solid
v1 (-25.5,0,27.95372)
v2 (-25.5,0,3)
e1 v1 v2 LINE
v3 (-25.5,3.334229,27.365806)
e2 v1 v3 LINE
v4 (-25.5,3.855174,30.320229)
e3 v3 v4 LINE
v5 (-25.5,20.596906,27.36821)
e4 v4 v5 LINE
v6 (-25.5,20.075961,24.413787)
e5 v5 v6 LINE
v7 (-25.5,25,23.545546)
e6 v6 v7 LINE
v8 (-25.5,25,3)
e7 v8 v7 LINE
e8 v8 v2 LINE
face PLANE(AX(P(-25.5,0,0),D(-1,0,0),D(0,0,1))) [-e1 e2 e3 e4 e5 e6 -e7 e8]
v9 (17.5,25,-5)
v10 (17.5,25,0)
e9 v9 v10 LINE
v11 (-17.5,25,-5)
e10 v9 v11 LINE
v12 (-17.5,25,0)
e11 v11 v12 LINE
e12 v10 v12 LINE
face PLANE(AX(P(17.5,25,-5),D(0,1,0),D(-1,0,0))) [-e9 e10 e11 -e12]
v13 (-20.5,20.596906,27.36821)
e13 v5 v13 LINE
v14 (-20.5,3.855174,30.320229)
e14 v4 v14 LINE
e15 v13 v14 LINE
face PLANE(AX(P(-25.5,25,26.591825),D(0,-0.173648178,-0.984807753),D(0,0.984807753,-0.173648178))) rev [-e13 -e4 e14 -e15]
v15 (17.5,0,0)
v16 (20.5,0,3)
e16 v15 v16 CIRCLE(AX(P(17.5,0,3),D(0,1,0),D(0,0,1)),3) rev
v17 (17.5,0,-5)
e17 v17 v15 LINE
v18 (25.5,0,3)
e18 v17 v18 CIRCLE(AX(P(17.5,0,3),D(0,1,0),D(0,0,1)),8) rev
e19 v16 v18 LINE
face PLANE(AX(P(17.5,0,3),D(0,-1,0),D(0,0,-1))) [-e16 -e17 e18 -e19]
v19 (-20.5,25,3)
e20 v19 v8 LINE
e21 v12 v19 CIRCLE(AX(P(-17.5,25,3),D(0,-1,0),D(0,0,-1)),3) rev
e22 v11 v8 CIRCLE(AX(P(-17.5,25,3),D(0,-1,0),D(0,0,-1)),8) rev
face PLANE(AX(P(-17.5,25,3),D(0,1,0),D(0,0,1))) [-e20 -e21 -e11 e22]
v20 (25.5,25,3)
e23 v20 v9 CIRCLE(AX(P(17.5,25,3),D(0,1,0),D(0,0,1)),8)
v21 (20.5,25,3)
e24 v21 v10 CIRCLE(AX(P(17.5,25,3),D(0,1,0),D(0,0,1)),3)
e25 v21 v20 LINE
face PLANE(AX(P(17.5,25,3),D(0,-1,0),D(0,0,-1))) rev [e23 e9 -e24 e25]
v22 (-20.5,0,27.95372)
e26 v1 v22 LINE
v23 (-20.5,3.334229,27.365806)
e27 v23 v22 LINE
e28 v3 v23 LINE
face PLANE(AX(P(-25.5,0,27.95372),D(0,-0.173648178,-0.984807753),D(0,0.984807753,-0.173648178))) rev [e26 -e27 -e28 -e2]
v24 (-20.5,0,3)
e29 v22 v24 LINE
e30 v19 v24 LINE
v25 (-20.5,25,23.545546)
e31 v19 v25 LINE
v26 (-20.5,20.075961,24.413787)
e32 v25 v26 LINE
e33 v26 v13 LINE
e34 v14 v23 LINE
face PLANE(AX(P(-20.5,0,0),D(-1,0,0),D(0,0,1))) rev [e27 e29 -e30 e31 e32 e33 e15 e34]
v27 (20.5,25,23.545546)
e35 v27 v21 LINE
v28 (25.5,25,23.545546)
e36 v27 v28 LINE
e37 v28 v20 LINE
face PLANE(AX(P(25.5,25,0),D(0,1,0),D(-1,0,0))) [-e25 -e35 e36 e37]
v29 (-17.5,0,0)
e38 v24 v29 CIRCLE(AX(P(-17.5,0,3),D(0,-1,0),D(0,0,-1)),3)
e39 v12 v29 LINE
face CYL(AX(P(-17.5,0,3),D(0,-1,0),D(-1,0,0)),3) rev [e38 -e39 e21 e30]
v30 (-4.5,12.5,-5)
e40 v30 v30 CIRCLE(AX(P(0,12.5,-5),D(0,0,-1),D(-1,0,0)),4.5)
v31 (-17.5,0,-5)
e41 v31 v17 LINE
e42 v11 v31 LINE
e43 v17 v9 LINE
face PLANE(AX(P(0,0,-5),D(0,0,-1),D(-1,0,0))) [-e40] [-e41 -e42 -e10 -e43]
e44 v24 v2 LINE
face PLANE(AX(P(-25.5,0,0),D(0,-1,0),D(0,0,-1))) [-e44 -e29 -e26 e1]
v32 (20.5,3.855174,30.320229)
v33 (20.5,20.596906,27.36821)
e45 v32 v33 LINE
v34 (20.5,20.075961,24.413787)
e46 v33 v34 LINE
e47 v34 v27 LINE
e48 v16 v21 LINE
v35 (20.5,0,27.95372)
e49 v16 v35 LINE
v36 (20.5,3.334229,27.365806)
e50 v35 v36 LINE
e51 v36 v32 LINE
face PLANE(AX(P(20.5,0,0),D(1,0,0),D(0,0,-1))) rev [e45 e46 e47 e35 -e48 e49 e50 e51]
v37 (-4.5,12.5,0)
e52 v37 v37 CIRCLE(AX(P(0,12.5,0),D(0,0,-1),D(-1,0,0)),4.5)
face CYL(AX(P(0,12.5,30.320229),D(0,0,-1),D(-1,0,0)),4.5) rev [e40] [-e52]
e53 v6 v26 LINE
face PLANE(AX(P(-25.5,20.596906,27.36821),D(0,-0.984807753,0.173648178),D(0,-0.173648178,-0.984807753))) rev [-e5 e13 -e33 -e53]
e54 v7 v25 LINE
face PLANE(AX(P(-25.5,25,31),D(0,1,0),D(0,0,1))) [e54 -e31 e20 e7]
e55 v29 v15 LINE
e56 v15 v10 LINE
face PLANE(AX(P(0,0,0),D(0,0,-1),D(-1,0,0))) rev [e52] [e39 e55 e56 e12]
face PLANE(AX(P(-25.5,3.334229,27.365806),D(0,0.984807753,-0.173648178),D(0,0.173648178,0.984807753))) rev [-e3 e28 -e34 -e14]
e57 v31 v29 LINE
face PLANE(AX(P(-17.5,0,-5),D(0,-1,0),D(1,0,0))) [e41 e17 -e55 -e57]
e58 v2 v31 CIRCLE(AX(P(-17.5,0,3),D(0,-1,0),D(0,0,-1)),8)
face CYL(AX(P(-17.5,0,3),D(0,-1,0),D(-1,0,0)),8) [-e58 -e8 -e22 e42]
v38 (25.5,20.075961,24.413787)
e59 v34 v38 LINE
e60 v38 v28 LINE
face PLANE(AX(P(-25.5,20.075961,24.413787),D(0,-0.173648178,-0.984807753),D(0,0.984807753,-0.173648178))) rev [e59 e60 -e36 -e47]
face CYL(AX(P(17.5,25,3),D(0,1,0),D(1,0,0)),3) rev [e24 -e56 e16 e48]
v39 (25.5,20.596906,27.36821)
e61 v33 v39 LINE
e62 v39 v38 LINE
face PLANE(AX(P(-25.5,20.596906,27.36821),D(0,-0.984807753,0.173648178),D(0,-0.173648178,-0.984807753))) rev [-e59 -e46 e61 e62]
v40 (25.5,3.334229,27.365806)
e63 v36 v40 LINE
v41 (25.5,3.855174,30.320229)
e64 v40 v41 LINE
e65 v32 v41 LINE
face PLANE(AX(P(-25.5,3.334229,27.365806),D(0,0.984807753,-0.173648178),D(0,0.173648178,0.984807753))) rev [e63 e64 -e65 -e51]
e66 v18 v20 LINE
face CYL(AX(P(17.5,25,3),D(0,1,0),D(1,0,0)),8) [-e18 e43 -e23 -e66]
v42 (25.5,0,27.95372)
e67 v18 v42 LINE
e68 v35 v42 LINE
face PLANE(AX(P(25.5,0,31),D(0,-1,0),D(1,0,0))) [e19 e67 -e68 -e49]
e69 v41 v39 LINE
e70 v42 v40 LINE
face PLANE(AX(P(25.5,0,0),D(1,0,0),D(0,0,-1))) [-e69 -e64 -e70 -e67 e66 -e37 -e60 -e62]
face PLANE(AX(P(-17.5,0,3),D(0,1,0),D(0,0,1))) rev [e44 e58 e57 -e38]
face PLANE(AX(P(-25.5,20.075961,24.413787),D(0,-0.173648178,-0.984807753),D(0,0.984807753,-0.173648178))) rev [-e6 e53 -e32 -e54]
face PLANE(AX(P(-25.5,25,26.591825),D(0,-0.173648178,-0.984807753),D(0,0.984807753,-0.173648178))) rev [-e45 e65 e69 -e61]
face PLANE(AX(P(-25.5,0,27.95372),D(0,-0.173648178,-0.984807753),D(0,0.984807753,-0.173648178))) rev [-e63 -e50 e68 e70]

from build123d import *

# Parameters (mm, degrees)
SKETCH_1_W             = 35
SKETCH_1_H             = 25
SM_BASE_FLANGE_1_DEPTH = 5
SM_EDGE_FLANGE_1_DEPTH = 25
SM_EDGE_FLANGE_2_DEPTH = 25
CUT_EXTRUDE_1_DEPTH    = 65.707032075
CUT_EXTRUDE_3_DEPTH    = 65.707032075
SKETCH_35_R            = 4.5
CUT_EXTRUDE_2_DEPTH    = 51.227169575


# Sheet-metal steps are written as plain solids
with BuildPart() as part:
    # Sketch 1 → Базовая кромка1 (new body)
    with BuildSketch(Plane.XY):
        with Locations((0, 12.5)):
            Rectangle(SKETCH_1_W, SKETCH_1_H)
    extrude(amount=-SM_BASE_FLANGE_1_DEPTH)

    # Ребро-кромка1 section (across the edge) → Ребро-кромка1 (add)
    with BuildSketch(Plane(origin=(-20.5, 25, 0), x_dir=(1, 0, 0), z_dir=(0, -1, 0))):
        with BuildLine():
            Line((-5, 3), (-5, 31))
            Line((-5, 31), (0, 31))
            Line((0, 31), (0, 3))
            ThreePointArc((0, 3), (0.878679656, 0.878679656), (3, 0))
            Line((3, 0), (3, -5))
            ThreePointArc((3, -5), (-2.656854249, -2.656854249), (-5, 3))
        make_face()
    extrude(amount=SM_EDGE_FLANGE_1_DEPTH)

    # Ребро-кромка2 section (across the edge) → Ребро-кромка2 (add)
    with BuildSketch(Plane(origin=(20.5, 0, 0), x_dir=(-1, 0, 0), z_dir=(0, 1, 0))):
        with BuildLine():
            Line((-5, 3), (-5, 31))
            Line((-5, 31), (0, 31))
            Line((0, 31), (0, 3))
            ThreePointArc((0, 3), (0.878679656, 0.878679656), (3, 0))
            Line((3, 0), (3, -5))
            ThreePointArc((3, -5), (-2.656854249, -2.656854249), (-5, 3))
        make_face()
    extrude(amount=SM_EDGE_FLANGE_2_DEPTH)

    # Эскиз33 → Вырез-Вытянуть1 (cut, through all)
    with BuildSketch(Plane(origin=(25.5, 0, 0), x_dir=(0, 0, -1), z_dir=(1, 0, 0))):
        Polygon((-31, 0), (-31, 25), (-26.591825482, 25), align=None)
    extrude(amount=-CUT_EXTRUDE_1_DEPTH, mode=Mode.SUBTRACT)

    # Эскиз36 → Вырез-Вытянуть3 (cut, through all)
    with BuildSketch(Plane(origin=(25.5, 0, 0), x_dir=(0, 0, -1), z_dir=(1, 0, 0))):
        Polygon((-26.591825482, 25), (-27.368209794, 20.596905768), (-24.413786535, 20.075961235), (-23.545545647, 25), align=None)
        Polygon((-27.365805555, 3.334229434), (-30.320228814, 3.855173967), (-31, 0), (-27.953720164, 0), align=None)
    extrude(amount=-CUT_EXTRUDE_3_DEPTH, mode=Mode.SUBTRACT)

    # Эскиз35 → Вырез-Вытянуть2 (cut, through all)
    with BuildSketch(Plane(origin=(0, 0, -5), x_dir=(-1, 0, 0), z_dir=(0, 0, -1))):
        with Locations((0, 12.5)):
            Circle(SKETCH_35_R)
    extrude(amount=-CUT_EXTRUDE_2_DEPTH, mode=Mode.SUBTRACT)


solid = part.part
